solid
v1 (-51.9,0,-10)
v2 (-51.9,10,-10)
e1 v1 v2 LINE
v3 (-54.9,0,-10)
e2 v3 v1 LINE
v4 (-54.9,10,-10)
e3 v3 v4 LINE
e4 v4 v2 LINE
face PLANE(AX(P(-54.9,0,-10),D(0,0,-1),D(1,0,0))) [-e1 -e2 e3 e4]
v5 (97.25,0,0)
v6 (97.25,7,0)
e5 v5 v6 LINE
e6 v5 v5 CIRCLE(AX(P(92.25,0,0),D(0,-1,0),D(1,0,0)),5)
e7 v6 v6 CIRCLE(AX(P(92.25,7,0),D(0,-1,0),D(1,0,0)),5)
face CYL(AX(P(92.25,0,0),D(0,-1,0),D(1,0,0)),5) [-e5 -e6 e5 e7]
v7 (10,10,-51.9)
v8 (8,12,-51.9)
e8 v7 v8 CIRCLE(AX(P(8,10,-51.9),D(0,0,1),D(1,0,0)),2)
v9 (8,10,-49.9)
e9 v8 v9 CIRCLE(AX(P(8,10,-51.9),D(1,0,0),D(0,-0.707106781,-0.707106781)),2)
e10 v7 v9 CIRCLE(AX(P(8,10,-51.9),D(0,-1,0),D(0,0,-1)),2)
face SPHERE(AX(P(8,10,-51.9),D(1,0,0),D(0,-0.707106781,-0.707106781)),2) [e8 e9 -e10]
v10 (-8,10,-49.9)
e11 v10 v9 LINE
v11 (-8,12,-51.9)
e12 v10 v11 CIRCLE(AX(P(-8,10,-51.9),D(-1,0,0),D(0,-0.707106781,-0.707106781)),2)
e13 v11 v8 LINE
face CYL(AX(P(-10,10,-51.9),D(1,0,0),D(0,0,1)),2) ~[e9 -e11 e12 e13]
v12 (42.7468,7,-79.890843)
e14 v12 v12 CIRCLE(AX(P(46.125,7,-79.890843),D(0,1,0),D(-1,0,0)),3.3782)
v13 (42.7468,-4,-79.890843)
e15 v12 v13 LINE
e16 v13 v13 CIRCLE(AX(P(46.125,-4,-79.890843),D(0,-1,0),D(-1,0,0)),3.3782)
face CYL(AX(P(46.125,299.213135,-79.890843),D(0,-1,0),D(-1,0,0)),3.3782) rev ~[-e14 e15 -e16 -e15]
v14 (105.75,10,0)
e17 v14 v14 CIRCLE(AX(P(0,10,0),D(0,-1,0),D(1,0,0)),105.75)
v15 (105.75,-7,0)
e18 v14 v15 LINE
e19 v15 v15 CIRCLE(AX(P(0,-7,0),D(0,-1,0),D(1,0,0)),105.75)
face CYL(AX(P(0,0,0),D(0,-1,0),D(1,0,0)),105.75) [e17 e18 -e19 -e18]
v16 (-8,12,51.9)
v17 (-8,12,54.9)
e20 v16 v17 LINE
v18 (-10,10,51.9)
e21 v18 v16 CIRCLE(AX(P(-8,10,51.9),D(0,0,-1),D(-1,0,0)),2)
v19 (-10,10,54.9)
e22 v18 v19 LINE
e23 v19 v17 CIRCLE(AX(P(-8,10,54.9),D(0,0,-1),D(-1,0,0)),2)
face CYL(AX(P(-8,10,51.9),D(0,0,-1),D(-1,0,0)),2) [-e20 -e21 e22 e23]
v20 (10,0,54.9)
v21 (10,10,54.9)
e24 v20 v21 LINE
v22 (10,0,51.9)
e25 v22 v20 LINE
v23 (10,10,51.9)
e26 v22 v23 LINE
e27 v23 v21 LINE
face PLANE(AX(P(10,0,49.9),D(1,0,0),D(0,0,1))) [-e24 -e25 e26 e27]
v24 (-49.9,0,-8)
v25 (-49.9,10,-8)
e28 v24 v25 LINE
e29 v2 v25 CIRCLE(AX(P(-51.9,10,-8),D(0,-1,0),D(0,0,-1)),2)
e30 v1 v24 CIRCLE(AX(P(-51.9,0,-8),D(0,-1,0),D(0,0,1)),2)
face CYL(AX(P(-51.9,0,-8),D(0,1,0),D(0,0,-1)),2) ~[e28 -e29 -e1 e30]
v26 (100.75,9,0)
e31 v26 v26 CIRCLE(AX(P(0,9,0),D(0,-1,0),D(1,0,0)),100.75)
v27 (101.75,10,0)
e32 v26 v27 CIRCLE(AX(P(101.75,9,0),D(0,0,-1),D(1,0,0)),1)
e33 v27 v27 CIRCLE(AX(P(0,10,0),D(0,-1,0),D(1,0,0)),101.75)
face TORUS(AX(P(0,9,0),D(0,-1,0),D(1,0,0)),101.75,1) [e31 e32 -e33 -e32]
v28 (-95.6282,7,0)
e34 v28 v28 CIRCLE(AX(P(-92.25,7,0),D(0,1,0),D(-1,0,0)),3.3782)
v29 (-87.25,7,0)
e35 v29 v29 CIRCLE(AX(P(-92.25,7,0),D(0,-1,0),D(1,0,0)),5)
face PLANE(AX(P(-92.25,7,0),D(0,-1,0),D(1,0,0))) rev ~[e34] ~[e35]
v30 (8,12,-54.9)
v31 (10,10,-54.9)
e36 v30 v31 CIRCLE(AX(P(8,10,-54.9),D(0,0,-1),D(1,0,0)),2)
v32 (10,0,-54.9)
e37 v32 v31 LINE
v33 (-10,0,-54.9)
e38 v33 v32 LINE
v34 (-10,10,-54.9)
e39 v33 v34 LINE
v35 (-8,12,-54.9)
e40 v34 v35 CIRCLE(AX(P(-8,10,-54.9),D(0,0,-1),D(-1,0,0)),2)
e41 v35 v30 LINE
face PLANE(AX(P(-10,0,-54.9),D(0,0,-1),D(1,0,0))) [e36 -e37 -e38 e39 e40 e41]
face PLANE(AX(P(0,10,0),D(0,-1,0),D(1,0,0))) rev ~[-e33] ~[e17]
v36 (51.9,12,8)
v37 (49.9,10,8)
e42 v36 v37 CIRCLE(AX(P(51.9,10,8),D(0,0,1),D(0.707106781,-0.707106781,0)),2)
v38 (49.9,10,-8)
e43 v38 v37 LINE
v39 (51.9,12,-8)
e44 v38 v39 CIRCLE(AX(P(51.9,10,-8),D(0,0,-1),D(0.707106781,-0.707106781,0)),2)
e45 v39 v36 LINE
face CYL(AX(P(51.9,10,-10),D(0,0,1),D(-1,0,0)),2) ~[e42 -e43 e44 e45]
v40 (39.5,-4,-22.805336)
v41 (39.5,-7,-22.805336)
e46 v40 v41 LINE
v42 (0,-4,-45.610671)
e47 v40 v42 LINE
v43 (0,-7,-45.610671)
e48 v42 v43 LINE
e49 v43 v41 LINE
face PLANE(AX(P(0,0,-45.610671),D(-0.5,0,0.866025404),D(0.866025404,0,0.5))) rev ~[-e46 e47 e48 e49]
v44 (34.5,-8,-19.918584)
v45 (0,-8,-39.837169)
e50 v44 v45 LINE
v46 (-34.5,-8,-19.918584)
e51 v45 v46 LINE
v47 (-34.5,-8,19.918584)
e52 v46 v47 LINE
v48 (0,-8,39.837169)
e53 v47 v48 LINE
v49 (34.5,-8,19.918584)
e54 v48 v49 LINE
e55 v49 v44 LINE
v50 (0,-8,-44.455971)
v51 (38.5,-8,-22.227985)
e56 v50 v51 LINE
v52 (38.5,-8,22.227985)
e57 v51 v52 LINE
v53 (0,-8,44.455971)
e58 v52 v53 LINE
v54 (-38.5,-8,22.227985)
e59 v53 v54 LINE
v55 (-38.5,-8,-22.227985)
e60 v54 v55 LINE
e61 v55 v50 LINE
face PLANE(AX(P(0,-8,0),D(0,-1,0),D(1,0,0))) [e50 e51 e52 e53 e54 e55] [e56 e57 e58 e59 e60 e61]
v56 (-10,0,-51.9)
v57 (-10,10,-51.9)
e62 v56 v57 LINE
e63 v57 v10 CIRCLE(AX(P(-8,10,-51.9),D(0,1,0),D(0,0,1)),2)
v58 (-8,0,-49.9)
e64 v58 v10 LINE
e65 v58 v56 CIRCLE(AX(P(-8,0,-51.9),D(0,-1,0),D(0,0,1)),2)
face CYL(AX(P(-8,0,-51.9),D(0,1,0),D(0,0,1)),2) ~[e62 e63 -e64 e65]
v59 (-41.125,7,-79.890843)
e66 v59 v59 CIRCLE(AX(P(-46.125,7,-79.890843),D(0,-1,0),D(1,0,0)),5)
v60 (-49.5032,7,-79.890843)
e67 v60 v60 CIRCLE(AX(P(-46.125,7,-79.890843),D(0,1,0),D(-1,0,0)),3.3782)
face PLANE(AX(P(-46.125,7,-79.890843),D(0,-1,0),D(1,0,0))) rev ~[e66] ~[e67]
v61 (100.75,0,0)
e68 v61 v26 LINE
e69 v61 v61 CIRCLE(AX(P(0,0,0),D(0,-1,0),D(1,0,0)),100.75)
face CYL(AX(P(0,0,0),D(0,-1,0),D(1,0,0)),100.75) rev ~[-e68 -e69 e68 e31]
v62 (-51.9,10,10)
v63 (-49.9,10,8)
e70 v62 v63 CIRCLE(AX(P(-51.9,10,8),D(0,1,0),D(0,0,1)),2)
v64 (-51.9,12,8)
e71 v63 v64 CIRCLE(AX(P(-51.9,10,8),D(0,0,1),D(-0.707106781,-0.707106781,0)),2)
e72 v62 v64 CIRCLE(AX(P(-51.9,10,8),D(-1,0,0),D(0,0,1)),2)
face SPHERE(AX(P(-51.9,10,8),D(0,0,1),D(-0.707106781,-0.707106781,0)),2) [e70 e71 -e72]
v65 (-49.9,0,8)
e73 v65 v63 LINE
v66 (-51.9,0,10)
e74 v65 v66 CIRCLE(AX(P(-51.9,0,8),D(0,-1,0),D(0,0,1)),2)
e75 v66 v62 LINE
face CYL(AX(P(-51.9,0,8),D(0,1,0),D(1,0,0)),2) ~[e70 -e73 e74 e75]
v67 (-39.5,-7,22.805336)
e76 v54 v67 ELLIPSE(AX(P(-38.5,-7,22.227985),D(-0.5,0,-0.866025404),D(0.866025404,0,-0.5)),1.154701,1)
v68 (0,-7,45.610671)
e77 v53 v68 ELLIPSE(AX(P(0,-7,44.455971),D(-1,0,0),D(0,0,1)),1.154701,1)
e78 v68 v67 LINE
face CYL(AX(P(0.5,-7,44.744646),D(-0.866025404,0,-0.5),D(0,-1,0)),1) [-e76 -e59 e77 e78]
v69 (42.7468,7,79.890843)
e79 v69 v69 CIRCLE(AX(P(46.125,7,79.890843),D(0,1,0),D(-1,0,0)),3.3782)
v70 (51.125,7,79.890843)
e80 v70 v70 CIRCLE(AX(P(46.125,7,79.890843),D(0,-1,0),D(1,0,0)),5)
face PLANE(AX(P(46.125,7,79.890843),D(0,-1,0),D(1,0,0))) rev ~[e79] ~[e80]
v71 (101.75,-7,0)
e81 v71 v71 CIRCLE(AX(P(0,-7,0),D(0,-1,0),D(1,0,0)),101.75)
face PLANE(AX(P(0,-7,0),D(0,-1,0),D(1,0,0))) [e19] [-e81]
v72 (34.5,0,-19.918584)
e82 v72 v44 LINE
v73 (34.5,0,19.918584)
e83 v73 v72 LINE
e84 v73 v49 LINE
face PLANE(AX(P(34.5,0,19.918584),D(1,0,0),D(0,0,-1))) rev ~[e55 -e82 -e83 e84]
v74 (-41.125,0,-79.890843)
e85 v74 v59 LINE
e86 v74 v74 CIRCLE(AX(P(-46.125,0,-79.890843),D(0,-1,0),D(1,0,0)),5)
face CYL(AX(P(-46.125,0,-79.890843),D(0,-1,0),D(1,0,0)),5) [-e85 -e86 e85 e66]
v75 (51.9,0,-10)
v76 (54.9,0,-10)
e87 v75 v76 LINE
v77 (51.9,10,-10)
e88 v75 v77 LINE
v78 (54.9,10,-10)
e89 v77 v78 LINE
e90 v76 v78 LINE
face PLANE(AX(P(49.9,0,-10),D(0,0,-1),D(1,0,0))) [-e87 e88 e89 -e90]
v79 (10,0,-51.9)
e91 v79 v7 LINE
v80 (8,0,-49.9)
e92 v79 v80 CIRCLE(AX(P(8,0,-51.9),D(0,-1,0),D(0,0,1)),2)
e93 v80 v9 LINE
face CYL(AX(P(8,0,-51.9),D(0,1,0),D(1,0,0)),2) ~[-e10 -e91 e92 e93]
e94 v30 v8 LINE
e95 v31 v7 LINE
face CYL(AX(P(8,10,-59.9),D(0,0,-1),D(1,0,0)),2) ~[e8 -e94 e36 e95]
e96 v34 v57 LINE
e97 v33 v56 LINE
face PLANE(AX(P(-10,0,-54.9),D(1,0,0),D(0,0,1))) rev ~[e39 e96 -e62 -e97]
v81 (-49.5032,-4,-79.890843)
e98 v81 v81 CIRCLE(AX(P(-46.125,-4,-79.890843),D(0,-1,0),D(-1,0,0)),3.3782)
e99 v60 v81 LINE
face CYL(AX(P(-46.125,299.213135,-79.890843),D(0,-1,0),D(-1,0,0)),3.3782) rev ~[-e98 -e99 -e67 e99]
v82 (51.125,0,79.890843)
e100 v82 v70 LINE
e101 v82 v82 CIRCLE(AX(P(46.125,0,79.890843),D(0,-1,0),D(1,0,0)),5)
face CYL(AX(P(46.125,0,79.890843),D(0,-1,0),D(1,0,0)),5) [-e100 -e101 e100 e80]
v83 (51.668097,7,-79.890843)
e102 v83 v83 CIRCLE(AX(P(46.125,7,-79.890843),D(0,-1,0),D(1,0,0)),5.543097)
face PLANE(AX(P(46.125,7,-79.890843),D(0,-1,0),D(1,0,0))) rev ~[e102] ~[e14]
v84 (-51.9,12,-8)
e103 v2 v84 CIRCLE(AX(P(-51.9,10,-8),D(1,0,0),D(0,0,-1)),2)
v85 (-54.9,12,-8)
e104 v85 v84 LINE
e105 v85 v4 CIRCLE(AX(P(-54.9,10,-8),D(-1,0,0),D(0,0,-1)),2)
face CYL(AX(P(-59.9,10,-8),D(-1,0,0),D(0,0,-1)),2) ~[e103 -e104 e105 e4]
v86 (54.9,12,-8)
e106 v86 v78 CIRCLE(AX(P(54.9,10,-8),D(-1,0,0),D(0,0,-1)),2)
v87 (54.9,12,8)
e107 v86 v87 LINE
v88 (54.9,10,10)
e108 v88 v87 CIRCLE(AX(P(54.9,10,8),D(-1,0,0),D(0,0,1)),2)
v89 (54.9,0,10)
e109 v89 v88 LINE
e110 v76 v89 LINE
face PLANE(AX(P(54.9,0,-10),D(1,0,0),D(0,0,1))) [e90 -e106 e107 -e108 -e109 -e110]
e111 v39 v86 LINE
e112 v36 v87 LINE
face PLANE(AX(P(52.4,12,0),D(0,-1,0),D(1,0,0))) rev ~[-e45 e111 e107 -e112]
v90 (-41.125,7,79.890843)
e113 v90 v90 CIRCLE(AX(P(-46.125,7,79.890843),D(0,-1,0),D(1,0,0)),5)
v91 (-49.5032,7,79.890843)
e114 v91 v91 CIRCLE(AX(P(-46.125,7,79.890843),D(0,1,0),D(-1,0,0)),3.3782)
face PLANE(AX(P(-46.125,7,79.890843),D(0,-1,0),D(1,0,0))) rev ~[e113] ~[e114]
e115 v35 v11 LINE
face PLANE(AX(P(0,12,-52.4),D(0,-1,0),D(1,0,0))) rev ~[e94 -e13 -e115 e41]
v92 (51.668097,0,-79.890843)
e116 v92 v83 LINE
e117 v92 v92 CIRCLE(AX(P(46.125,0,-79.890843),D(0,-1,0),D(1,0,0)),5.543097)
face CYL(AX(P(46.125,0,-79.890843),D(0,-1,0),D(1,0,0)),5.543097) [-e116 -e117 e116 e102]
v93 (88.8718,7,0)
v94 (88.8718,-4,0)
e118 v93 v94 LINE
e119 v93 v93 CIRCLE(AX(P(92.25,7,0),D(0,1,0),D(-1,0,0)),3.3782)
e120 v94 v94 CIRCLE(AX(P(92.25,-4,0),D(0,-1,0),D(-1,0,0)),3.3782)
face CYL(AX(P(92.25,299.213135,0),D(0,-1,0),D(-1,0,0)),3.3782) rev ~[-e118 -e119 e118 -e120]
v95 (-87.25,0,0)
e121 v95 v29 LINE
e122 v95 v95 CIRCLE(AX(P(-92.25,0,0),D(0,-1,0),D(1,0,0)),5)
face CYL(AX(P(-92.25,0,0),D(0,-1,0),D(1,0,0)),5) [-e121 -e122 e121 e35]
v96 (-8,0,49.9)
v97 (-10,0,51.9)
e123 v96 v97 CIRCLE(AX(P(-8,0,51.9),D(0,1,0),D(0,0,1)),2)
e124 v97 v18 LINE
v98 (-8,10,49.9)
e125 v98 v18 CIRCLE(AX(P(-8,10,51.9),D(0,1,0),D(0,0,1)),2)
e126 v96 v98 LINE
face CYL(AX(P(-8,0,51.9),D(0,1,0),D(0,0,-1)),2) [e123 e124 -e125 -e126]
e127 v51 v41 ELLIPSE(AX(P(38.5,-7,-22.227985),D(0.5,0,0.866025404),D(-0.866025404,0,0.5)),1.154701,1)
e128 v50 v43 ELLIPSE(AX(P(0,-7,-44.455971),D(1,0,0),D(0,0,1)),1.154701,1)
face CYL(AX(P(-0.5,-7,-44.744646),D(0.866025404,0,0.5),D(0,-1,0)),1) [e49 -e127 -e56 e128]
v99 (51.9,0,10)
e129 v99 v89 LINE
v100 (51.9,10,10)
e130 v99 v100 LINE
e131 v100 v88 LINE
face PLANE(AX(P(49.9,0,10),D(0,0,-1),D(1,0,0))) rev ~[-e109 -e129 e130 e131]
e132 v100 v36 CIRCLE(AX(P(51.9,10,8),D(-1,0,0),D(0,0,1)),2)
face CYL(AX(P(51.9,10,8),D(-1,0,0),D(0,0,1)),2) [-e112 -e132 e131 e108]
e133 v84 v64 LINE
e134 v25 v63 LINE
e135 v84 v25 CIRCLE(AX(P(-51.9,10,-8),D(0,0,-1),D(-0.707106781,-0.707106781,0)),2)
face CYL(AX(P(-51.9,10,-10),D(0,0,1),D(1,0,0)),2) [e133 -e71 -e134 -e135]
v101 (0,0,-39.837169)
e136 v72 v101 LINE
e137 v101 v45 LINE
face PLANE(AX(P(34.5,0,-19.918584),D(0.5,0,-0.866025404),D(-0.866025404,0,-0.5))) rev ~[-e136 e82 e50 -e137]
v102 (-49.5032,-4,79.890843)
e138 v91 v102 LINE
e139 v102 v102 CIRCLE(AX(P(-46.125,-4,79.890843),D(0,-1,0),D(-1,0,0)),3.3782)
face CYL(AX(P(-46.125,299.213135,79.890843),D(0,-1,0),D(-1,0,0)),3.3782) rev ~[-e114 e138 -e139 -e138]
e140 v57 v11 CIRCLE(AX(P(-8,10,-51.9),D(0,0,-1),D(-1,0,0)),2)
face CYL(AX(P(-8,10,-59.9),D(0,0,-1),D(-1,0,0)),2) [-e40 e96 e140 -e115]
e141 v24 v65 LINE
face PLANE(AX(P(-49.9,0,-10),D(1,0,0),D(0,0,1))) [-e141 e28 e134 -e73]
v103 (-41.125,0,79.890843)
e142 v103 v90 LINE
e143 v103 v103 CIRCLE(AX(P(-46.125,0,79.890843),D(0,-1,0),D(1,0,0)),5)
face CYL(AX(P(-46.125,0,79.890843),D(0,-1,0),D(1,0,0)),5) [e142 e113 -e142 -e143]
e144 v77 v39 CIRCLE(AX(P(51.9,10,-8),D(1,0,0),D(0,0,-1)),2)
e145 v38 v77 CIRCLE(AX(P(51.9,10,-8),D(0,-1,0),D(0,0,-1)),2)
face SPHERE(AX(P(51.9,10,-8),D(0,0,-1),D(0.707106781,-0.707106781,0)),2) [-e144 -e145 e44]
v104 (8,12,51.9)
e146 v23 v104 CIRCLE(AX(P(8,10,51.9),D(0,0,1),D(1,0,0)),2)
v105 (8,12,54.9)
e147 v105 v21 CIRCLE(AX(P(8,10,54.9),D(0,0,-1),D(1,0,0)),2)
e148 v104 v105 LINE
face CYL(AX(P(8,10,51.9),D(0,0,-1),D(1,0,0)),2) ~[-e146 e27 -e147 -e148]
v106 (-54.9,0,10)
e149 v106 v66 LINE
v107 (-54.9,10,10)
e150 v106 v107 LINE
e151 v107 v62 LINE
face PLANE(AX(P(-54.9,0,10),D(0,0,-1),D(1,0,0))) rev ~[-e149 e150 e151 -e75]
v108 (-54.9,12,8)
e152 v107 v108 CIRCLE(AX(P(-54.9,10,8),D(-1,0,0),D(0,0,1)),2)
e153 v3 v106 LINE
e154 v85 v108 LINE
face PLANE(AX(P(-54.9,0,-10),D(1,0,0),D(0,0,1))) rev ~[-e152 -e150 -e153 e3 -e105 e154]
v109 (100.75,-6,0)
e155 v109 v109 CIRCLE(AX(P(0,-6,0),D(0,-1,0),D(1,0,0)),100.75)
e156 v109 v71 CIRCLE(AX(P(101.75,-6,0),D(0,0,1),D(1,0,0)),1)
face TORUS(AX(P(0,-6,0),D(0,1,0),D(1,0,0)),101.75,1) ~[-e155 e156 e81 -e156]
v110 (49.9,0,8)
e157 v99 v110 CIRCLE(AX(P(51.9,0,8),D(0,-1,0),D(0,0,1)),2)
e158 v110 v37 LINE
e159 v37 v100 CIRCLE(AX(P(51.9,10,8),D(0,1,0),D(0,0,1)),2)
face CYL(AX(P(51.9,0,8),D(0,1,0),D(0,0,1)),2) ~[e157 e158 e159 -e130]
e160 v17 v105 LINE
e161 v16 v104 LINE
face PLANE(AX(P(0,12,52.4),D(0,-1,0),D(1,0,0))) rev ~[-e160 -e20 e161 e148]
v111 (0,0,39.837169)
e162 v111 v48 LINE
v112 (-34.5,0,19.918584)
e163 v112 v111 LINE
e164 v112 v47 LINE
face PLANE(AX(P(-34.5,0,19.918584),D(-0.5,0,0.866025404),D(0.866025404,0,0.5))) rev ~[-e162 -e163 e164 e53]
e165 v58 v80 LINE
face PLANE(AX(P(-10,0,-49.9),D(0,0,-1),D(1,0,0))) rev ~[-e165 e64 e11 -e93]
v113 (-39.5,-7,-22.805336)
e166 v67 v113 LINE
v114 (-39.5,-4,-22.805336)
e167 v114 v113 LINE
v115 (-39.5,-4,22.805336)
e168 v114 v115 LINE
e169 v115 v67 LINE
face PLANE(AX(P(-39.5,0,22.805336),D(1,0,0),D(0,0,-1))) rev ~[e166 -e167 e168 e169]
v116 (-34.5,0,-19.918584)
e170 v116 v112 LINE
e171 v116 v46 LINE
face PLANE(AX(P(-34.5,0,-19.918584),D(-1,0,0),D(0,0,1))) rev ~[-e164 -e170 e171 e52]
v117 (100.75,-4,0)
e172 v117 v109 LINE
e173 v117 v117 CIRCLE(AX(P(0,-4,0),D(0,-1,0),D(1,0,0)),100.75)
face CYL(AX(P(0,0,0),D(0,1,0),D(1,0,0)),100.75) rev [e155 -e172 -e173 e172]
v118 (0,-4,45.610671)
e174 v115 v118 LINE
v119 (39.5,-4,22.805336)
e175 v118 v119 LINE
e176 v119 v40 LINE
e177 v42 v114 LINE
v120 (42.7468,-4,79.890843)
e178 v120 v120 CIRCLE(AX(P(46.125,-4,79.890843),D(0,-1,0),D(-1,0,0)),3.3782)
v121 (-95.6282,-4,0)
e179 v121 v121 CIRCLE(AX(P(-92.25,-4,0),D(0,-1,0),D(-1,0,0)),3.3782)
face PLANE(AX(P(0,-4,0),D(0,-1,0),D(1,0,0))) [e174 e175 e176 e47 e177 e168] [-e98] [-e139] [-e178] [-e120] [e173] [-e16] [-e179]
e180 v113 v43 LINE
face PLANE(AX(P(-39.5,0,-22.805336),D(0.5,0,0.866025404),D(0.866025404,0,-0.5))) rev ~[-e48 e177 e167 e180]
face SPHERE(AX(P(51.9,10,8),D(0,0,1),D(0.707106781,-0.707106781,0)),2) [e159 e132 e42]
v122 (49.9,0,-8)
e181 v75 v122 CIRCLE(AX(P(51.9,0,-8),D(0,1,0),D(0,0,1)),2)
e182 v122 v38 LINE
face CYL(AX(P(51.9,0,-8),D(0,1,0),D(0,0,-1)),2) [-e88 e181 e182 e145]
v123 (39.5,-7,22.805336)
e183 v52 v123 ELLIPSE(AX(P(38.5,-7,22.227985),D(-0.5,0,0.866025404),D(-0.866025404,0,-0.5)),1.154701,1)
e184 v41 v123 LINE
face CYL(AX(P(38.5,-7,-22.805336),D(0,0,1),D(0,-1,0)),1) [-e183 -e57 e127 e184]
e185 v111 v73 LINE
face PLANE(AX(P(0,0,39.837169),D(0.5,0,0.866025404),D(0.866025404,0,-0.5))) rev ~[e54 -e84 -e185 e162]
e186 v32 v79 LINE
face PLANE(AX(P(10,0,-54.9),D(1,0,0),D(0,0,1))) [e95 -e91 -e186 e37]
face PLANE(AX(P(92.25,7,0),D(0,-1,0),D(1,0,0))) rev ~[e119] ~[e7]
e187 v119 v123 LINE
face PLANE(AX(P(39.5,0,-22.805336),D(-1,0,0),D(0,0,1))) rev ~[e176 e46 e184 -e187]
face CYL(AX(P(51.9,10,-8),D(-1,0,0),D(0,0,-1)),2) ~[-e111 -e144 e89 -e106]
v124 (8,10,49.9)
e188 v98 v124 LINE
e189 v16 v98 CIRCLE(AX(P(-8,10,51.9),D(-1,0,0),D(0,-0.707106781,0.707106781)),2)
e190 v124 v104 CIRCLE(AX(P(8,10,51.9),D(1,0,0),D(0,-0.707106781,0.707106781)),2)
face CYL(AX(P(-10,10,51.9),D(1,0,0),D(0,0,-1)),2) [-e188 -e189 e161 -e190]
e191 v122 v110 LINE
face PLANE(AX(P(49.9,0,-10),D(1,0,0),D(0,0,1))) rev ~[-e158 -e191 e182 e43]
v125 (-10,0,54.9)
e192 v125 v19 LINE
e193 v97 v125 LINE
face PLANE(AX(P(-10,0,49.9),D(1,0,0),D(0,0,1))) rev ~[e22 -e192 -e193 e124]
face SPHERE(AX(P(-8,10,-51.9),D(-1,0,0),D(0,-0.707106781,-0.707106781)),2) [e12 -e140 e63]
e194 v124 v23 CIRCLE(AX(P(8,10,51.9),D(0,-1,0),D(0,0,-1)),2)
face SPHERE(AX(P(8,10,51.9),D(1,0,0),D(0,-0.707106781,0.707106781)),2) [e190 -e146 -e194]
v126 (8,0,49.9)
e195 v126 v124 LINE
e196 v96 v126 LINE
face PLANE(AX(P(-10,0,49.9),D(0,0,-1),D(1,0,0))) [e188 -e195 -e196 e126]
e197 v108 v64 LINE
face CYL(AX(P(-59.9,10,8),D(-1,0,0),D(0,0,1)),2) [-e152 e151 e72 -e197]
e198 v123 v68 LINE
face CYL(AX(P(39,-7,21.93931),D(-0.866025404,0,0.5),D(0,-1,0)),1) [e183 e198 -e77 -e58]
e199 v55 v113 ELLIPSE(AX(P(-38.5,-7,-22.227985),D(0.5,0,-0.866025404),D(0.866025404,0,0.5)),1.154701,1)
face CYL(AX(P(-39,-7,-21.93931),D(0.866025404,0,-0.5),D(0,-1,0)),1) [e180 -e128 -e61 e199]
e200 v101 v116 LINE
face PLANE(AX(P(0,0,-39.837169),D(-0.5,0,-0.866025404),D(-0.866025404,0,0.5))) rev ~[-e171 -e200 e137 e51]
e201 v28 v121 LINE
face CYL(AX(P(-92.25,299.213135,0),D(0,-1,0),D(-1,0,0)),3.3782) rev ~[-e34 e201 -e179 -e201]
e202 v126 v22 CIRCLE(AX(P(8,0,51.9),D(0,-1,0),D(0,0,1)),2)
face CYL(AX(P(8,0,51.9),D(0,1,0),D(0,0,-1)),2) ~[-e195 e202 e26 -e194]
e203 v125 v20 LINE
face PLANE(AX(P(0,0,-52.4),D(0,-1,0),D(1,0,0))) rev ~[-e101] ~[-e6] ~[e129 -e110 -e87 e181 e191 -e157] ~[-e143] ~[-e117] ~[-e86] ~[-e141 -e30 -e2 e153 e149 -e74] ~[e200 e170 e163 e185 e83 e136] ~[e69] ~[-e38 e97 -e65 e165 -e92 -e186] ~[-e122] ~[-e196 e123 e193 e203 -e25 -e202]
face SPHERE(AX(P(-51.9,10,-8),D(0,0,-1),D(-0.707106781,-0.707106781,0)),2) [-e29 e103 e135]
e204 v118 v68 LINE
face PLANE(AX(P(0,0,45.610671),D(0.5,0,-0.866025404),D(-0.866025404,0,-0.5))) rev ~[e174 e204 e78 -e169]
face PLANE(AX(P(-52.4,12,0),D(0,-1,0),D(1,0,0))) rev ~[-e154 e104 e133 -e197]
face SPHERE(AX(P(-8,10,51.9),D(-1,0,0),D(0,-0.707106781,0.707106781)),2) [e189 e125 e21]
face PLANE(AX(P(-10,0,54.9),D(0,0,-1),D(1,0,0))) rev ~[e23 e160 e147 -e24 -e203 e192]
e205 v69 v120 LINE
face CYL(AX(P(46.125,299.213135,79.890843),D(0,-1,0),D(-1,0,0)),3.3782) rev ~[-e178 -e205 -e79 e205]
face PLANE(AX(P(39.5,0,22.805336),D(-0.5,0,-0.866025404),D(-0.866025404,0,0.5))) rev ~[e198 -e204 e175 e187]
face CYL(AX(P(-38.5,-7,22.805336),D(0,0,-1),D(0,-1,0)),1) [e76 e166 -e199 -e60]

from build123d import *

# Parameters (mm, degrees)
F0_R          = 100.75
F0_R_2        = 5
F0_R_3        = 5.5430968475
F1_DEPTH      = 4
F2_DEPTH      = 4
F3_DEPTH      = 8
F0_R_4        = 105.75
F4_DEPTH      = 7
F6_R          = 1
F7_D          = 6.7564
F8_R          = 1
F9_DEPTH      = 7
F10_DEPTH     = 10
F11_D         = 6.7564
F12_R         = 1
F0_W          = 20
F0_H          = 5
F0_W_2        = 5
F0_H_2        = 20
F13_DEPTH     = 4
F14_DEPTH     = 12
F15_R         = 2
F16_T1_DEPTH  = 8
F16_T3_DEPTH  = 8
F16_T5_DEPTH  = 8
F16_T7_DEPTH  = 8
F16_S11_W     = 2
F16_S11_H     = 2
F16_T12_DEPTH = 2
F16_S17_W     = 2
F16_S17_H     = 2
F16_T18_DEPTH = 2
F16_S23_W     = 2
F16_S23_H     = 2
F16_T24_DEPTH = 2
F16_S29_W     = 2
F16_S29_H     = 2
F16_T30_DEPTH = 2
F16_S35_W     = 2
F16_S35_H     = 2
F16_T36_DEPTH = 2
F16_S41_W     = 2
F16_S41_H     = 2
F16_T42_DEPTH = 2
F16_S47_W     = 2
F16_S47_H     = 2
F16_T48_DEPTH = 2
F16_S53_W     = 2
F16_S53_H     = 2
F16_T54_DEPTH = 2


# Not quite as in the source:
# - a fillet or chamfer that OpenCascade refuses, or shapes differently, is made with other operations: its cross-section is extruded or revolved along the edge and cut away or added
# - a feature names something its author has since deleted; it is built from what else it names


with BuildPart() as f1:
    # F0 (on Front) → F1 (new body)
    with BuildSketch(Plane.XZ):
        Circle(F0_R)
        with Locations((-46.125, -79.8908434991)):
            Circle(F0_R_2, mode=Mode.SUBTRACT)
        with Locations((46.125, -79.8908434991)):
            Circle(F0_R_3, mode=Mode.SUBTRACT)
        with Locations((-92.25, 0)):
            Circle(F0_R_2, mode=Mode.SUBTRACT)
        with Locations((-46.125, 79.8908434991)):
            Circle(F0_R_2, mode=Mode.SUBTRACT)
        Polygon((80.5, 46.4766966698), (80.5, -46.4766966698), (0, -92.9533933395), (-80.5, -46.4766966698), (-80.5, 46.4766966698), (0, 92.9533933395), align=None, mode=Mode.SUBTRACT)
        with Locations((92.25, 0)):
            Circle(F0_R_2, mode=Mode.SUBTRACT)
        with Locations((46.125, 79.8908434991)):
            Circle(F0_R_2, mode=Mode.SUBTRACT)
        with Locations((46.125, 79.8908434991)):
            Circle(F0_R_2)
        with Locations((92.25, 0)):
            Circle(F0_R_2)
        with Locations((46.125, -79.8908434991)):
            Circle(F0_R_3)
        with Locations((-46.125, -79.8908434991)):
            Circle(F0_R_2)
        with Locations((-92.25, 0)):
            Circle(F0_R_2)
        with Locations((-46.125, 79.8908434991)):
            Circle(F0_R_2)
    extrude(amount=F1_DEPTH)



with BuildPart() as f1b:
    # F0 (on Front) → F1, piece 2 (new body)
    with BuildSketch(Plane.XZ):
        Polygon((77.5, -44.7446458622), (77.5, 44.7446458622), (0, 89.4892917244), (-77.5, 44.7446458622), (-77.5, -44.7446458622), (0, -89.4892917244), align=None)
        Polygon((49.9, -10), (49.9, -49.9), (10, -49.9), (10, -54.9), (-10, -54.9), (-10, -49.9), (-49.9, -49.9), (-49.9, -10), (-54.9, -10), (-54.9, 10), (-49.9, 10), (-49.9, 49.9), (-10, 49.9), (-10, 54.9), (10, 54.9), (10, 49.9), (49.9, 49.9), (49.9, 10), (54.9, 10), (54.9, -10), align=None, mode=Mode.SUBTRACT)
        Polygon((10, -49.9), (49.9, -49.9), (49.9, -10), (49.9, 10), (49.9, 49.9), (10, 49.9), (-10, 49.9), (-49.9, 49.9), (-49.9, 10), (-49.9, -10), (-49.9, -49.9), (-10, -49.9), align=None)
        Polygon((39.5, 22.805335633), (39.5, -22.805335633), (0, -45.610671266), (-39.5, -22.805335633), (-39.5, 22.805335633), (0, 45.610671266), align=None, mode=Mode.SUBTRACT)
    extrude(amount=F1_DEPTH)


with BuildPart() as f1_1:
    add(f1.part)

    add(f1b.part)  # F2 merges F1b
    # F0 (on Front) → F2 (join)
    with BuildSketch(Plane.XZ):
        Polygon((0, -92.9533933395), (80.5, -46.4766966698), (80.5, 46.4766966698), (0, 92.9533933395), (-80.5, 46.4766966698), (-80.5, -46.4766966698), align=None)
        Polygon((0, 89.4892917244), (77.5, 44.7446458622), (77.5, -44.7446458622), (0, -89.4892917244), (-77.5, -44.7446458622), (-77.5, 44.7446458622), align=None, mode=Mode.SUBTRACT)
    extrude(amount=F2_DEPTH)

    # F0 (on Front) → F3 (join)
    with BuildSketch(Plane.XZ):
        Polygon((0, -45.610671266), (39.5, -22.805335633), (39.5, 22.805335633), (0, 45.610671266), (-39.5, 22.805335633), (-39.5, -22.805335633), align=None)
        Polygon((34.5, 19.918584287), (34.5, -19.918584287), (0, -39.8371685741), (-34.5, -19.918584287), (-34.5, 19.918584287), (0, 39.8371685741), align=None, mode=Mode.SUBTRACT)
    extrude(amount=F3_DEPTH)

    # F0 (on Front) → F4 (join)
    with BuildSketch(Plane.XZ):
        Circle(F0_R_4)
        Circle(F0_R, mode=Mode.SUBTRACT)
    extrude(amount=F4_DEPTH)

    # F5: union 

    # F6
    f6_edges = [f1_1.edges().sort_by_distance(p)[0] for p in [
        (19.75, -8, 34.208003),
        (39.5, -8, 0),
        (19.75, -8, -34.208003),
        (-19.75, -8, -34.208003),
        (-39.5, -8, 0),
        (-19.75, -8, 34.208003),
    ]]
    fillet(f6_edges, radius=F6_R)

    # F7 (through all)
    with Locations(Plane(origin=(0, 0, 0), x_dir=(1, 0, 0), z_dir=(0, 1, 0))):
        with Locations((-46.125, -79.8908434991), (46.125, -79.8908434991), (92.25, 0), (46.125, 79.8908434991), (-46.125, 79.8908434991), (-92.25, 0)):
            Hole(F7_D / 2)

    # F8
    f8_edges = [f1_1.edges().sort_by_distance(p)[0] for p in [
        (-100.75, -7, 0),
    ]]
    fillet(f8_edges, radius=F8_R)

    # F0 (on Front) → F9 (join)
    with BuildSketch(Plane.XZ):
        with Locations((-46.125, 79.8908434991)):
            Circle(F0_R_2)
        with Locations((46.125, 79.8908434991)):
            Circle(F0_R_2)
        with Locations((92.25, 0)):
            Circle(F0_R_2)
        with Locations((46.125, -79.8908434991)):
            Circle(F0_R_3)
        with Locations((-46.125, -79.8908434991)):
            Circle(F0_R_2)
        with Locations((-92.25, 0)):
            Circle(F0_R_2)
    extrude(amount=-F9_DEPTH)

    # F0 (on Front) → F10 (join)
    with BuildSketch(Plane.XZ):
        Circle(F0_R_4)
        Circle(F0_R, mode=Mode.SUBTRACT)
    extrude(amount=-F10_DEPTH)

    # F11 (through all)
    with Locations(Plane.XZ):
        with Locations((-46.125, 79.8908434991), (46.125, 79.8908434991), (92.25, 0), (46.125, -79.8908434991), (-46.125, -79.8908434991), (-92.25, 0)):
            Hole(F11_D / 2)

    # F12
    f12_edges = [f1_1.edges().sort_by_distance(p)[0] for p in [
        (-100.75, 10, 0),
    ]]
    fillet(f12_edges, radius=F12_R)

    # F0 (on Front) → F13 (join)
    with BuildSketch(Plane.XZ):
        with Locations((0, -52.4)):
            Rectangle(F0_W, F0_H)
        with Locations((52.4, 0)):
            Rectangle(F0_W_2, F0_H_2)
        with Locations((0, 52.4)):
            Rectangle(F0_W, F0_H)
        with Locations((-52.4, 0)):
            Rectangle(F0_W_2, F0_H_2)
    extrude(amount=F13_DEPTH)

    # F0 (on Front) → F14 (join)
    with BuildSketch(Plane.XZ):
        with Locations((0, -52.4)):
            Rectangle(F0_W, F0_H)
        with Locations((52.4, 0)):
            Rectangle(F0_W_2, F0_H_2)
        with Locations((0, 52.4)):
            Rectangle(F0_W, F0_H)
        with Locations((-52.4, 0)):
            Rectangle(F0_W_2, F0_H_2)
    extrude(amount=-F14_DEPTH)

    # F15
    f15_edges = [f1_1.edges().sort_by_distance(p)[0] for p in [
        (0, 12, -49.9),
        (49.9, 12, 0),
        (0, 12, 49.9),
        (-49.9, 12, 0),
        (-10, 6, -49.9),
        (49.9, 6, 10),
        (49.9, 6, -10),
        (10, 6, -49.9),
        (-49.9, 6, -10),
        (-49.9, 6, 10),
        (-10, 6, 49.9),
        (10, 6, 49.9),
    ]]
    fillet(f15_edges, radius=F15_R)

    # F16: fillet of radius 2 on 8 edges, made by hand

    # F16_s2 → F16_t1 (cut)
    with BuildSketch(Plane.XY.offset(-59.9)):
        with BuildLine():
            ThreePointArc((-10, 10), (-9.4142135624, 11.4142135624), (-8, 12))
            Line((-8, 12), (-10, 12))
            Line((-10, 12), (-10, 10))
        make_face()
        with BuildLine():
            ThreePointArc((10, 10), (9.4142135624, 11.4142135624), (8, 12))
            Line((8, 12), (10, 12))
            Line((10, 12), (10, 10))
        make_face()
    extrude(amount=F16_T1_DEPTH, mode=Mode.SUBTRACT)

    # F16_s4 → F16_t3 (cut)
    with BuildSketch(Plane.YZ.offset(51.9)):
        with BuildLine():
            ThreePointArc((10, 10), (11.4142135624, 9.4142135624), (12, 8))
            Line((12, 8), (12, 10))
            Line((12, 10), (10, 10))
        make_face()
        with BuildLine():
            ThreePointArc((10, -10), (11.4142135624, -9.4142135624), (12, -8))
            Line((12, -8), (12, -10))
            Line((12, -10), (10, -10))
        make_face()
    extrude(amount=F16_T3_DEPTH, mode=Mode.SUBTRACT)

    # F16_s6 → F16_t5 (cut)
    with BuildSketch(Plane.XY.offset(51.9)):
        with BuildLine():
            ThreePointArc((10, 10), (9.4142135624, 11.4142135624), (8, 12))
            Line((8, 12), (10, 12))
            Line((10, 12), (10, 10))
        make_face()
        with BuildLine():
            ThreePointArc((-10, 10), (-9.4142135624, 11.4142135624), (-8, 12))
            Line((-8, 12), (-10, 12))
            Line((-10, 12), (-10, 10))
        make_face()
    extrude(amount=F16_T5_DEPTH, mode=Mode.SUBTRACT)

    # F16_s8 → F16_t7 (cut)
    with BuildSketch(Plane.YZ.offset(-59.9)):
        with BuildLine():
            ThreePointArc((10, 10), (11.4142135624, 9.4142135624), (12, 8))
            Line((12, 8), (12, 10))
            Line((12, 10), (10, 10))
        make_face()
        with BuildLine():
            ThreePointArc((10, -10), (11.4142135624, -9.4142135624), (12, -8))
            Line((12, -8), (12, -10))
            Line((12, -10), (10, -10))
        make_face()
    extrude(amount=F16_T7_DEPTH, mode=Mode.SUBTRACT)


with BuildPart() as f16_tool10:
    # F16_s11 → F16_t12 (new body)
    with BuildSketch(Plane.XY.offset(-8)):
        with Locations((-50.9, 11)):
            Rectangle(F16_S11_W, F16_S11_H)
    extrude(amount=-F16_T12_DEPTH)

    # F16_s13 → F16_t14 (revolve, cut)
    with BuildSketch(Plane(origin=(-51.9, 10, -8), x_dir=(-0.7071067812, -0.7071067812, 0), z_dir=(0.7071067812, -0.7071067812, 0))):
        with BuildLine():
            ThreePointArc((0, -2), (2, 0), (0, 2))
            Line((0, 2), (0, -2))
        make_face()
    revolve(axis=Axis((-51.9, 10, -8), (0, 0, -1)), mode=Mode.SUBTRACT)


with BuildPart() as f1_2:
    add(f1_1.part)

    # F16_t9: cut F16_tool10
    add(f16_tool10.part, mode=Mode.SUBTRACT)


with BuildPart() as f16_tool16:
    # F16_s17 → F16_t18 (new body)
    with BuildSketch(Plane.XY.offset(8)):
        with Locations((-50.9, 11)):
            Rectangle(F16_S17_W, F16_S17_H)
    extrude(amount=F16_T18_DEPTH)

    # F16_s19 → F16_t20 (revolve, cut)
    with BuildSketch(Plane(origin=(-51.9, 10, 8), x_dir=(-0.7071067812, -0.7071067812, 0), z_dir=(-0.7071067812, 0.7071067812, 0))):
        with BuildLine():
            ThreePointArc((0, -2), (2, 0), (0, 2))
            Line((0, 2), (0, -2))
        make_face()
    revolve(axis=Axis((-51.9, 10, 8), (0, 0, 1)), mode=Mode.SUBTRACT)


with BuildPart() as f1_3:
    add(f1_2.part)

    # F16_t15: cut F16_tool16
    add(f16_tool16.part, mode=Mode.SUBTRACT)


with BuildPart() as f16_tool22:
    # F16_s23 → F16_t24 (new body)
    with BuildSketch(Plane.YZ.offset(-8)):
        with Locations((11, 50.9)):
            Rectangle(F16_S23_W, F16_S23_H)
    extrude(amount=-F16_T24_DEPTH)

    # F16_s25 → F16_t26 (revolve, cut)
    with BuildSketch(Plane(origin=(-8, 10, 51.9), x_dir=(0, -0.7071067812, 0.7071067812), z_dir=(0, -0.7071067812, -0.7071067812))):
        with BuildLine():
            ThreePointArc((0, -2), (2, 0), (0, 2))
            Line((0, 2), (0, -2))
        make_face()
    revolve(axis=Axis((-8, 10, 51.9), (-1, 0, 0)), mode=Mode.SUBTRACT)


with BuildPart() as f1_4:
    add(f1_3.part)

    # F16_t21: cut F16_tool22
    add(f16_tool22.part, mode=Mode.SUBTRACT)


with BuildPart() as f16_tool28:
    # F16_s29 → F16_t30 (new body)
    with BuildSketch(Plane.YZ.offset(8)):
        with Locations((11, 50.9)):
            Rectangle(F16_S29_W, F16_S29_H)
    extrude(amount=F16_T30_DEPTH)

    # F16_s31 → F16_t32 (revolve, cut)
    with BuildSketch(Plane(origin=(8, 10, 51.9), x_dir=(0, -0.7071067812, 0.7071067812), z_dir=(0, 0.7071067812, 0.7071067812))):
        with BuildLine():
            ThreePointArc((0, -2), (2, 0), (0, 2))
            Line((0, 2), (0, -2))
        make_face()
    revolve(axis=Axis((8, 10, 51.9), (1, 0, 0)), mode=Mode.SUBTRACT)


with BuildPart() as f1_5:
    add(f1_4.part)

    # F16_t27: cut F16_tool28
    add(f16_tool28.part, mode=Mode.SUBTRACT)


with BuildPart() as f16_tool34:
    # F16_s35 → F16_t36 (new body)
    with BuildSketch(Plane.XY.offset(-8)):
        with Locations((50.9, 11)):
            Rectangle(F16_S35_W, F16_S35_H)
    extrude(amount=-F16_T36_DEPTH)

    # F16_s37 → F16_t38 (revolve, cut)
    with BuildSketch(Plane(origin=(51.9, 10, -8), x_dir=(0.7071067812, -0.7071067812, 0), z_dir=(0.7071067812, 0.7071067812, 0))):
        with BuildLine():
            ThreePointArc((0, -2), (2, 0), (0, 2))
            Line((0, 2), (0, -2))
        make_face()
    revolve(axis=Axis((51.9, 10, -8), (0, 0, -1)), mode=Mode.SUBTRACT)


with BuildPart() as f1_6:
    add(f1_5.part)

    # F16_t33: cut F16_tool34
    add(f16_tool34.part, mode=Mode.SUBTRACT)


with BuildPart() as f16_tool40:
    # F16_s41 → F16_t42 (new body)
    with BuildSketch(Plane.XY.offset(8)):
        with Locations((50.9, 11)):
            Rectangle(F16_S41_W, F16_S41_H)
    extrude(amount=F16_T42_DEPTH)

    # F16_s43 → F16_t44 (revolve, cut)
    with BuildSketch(Plane(origin=(51.9, 10, 8), x_dir=(0.7071067812, -0.7071067812, 0), z_dir=(-0.7071067812, -0.7071067812, 0))):
        with BuildLine():
            ThreePointArc((0, -2), (2, 0), (0, 2))
            Line((0, 2), (0, -2))
        make_face()
    revolve(axis=Axis((51.9, 10, 8), (0, 0, 1)), mode=Mode.SUBTRACT)


with BuildPart() as f1_7:
    add(f1_6.part)

    # F16_t39: cut F16_tool40
    add(f16_tool40.part, mode=Mode.SUBTRACT)


with BuildPart() as f16_tool46:
    # F16_s47 → F16_t48 (new body)
    with BuildSketch(Plane.YZ.offset(8)):
        with Locations((11, -50.9)):
            Rectangle(F16_S47_W, F16_S47_H)
    extrude(amount=F16_T48_DEPTH)

    # F16_s49 → F16_t50 (revolve, cut)
    with BuildSketch(Plane(origin=(8, 10, -51.9), x_dir=(0, -0.7071067812, -0.7071067812), z_dir=(0, -0.7071067812, 0.7071067812))):
        with BuildLine():
            ThreePointArc((0, -2), (2, 0), (0, 2))
            Line((0, 2), (0, -2))
        make_face()
    revolve(axis=Axis((8, 10, -51.9), (1, 0, 0)), mode=Mode.SUBTRACT)


with BuildPart() as f1_8:
    add(f1_7.part)

    # F16_t45: cut F16_tool46
    add(f16_tool46.part, mode=Mode.SUBTRACT)


with BuildPart() as f16_tool52:
    # F16_s53 → F16_t54 (new body)
    with BuildSketch(Plane.YZ.offset(-8)):
        with Locations((11, -50.9)):
            Rectangle(F16_S53_W, F16_S53_H)
    extrude(amount=-F16_T54_DEPTH)

    # F16_s55 → F16_t56 (revolve, cut)
    with BuildSketch(Plane(origin=(-8, 10, -51.9), x_dir=(0, -0.7071067812, -0.7071067812), z_dir=(0, 0.7071067812, -0.7071067812))):
        with BuildLine():
            ThreePointArc((0, -2), (2, 0), (0, 2))
            Line((0, 2), (0, -2))
        make_face()
    revolve(axis=Axis((-8, 10, -51.9), (-1, 0, 0)), mode=Mode.SUBTRACT)


with BuildPart() as f1_9:
    add(f1_8.part)

    # F16_t51: cut F16_tool52
    add(f16_tool52.part, mode=Mode.SUBTRACT)


solid = f1_9.part
